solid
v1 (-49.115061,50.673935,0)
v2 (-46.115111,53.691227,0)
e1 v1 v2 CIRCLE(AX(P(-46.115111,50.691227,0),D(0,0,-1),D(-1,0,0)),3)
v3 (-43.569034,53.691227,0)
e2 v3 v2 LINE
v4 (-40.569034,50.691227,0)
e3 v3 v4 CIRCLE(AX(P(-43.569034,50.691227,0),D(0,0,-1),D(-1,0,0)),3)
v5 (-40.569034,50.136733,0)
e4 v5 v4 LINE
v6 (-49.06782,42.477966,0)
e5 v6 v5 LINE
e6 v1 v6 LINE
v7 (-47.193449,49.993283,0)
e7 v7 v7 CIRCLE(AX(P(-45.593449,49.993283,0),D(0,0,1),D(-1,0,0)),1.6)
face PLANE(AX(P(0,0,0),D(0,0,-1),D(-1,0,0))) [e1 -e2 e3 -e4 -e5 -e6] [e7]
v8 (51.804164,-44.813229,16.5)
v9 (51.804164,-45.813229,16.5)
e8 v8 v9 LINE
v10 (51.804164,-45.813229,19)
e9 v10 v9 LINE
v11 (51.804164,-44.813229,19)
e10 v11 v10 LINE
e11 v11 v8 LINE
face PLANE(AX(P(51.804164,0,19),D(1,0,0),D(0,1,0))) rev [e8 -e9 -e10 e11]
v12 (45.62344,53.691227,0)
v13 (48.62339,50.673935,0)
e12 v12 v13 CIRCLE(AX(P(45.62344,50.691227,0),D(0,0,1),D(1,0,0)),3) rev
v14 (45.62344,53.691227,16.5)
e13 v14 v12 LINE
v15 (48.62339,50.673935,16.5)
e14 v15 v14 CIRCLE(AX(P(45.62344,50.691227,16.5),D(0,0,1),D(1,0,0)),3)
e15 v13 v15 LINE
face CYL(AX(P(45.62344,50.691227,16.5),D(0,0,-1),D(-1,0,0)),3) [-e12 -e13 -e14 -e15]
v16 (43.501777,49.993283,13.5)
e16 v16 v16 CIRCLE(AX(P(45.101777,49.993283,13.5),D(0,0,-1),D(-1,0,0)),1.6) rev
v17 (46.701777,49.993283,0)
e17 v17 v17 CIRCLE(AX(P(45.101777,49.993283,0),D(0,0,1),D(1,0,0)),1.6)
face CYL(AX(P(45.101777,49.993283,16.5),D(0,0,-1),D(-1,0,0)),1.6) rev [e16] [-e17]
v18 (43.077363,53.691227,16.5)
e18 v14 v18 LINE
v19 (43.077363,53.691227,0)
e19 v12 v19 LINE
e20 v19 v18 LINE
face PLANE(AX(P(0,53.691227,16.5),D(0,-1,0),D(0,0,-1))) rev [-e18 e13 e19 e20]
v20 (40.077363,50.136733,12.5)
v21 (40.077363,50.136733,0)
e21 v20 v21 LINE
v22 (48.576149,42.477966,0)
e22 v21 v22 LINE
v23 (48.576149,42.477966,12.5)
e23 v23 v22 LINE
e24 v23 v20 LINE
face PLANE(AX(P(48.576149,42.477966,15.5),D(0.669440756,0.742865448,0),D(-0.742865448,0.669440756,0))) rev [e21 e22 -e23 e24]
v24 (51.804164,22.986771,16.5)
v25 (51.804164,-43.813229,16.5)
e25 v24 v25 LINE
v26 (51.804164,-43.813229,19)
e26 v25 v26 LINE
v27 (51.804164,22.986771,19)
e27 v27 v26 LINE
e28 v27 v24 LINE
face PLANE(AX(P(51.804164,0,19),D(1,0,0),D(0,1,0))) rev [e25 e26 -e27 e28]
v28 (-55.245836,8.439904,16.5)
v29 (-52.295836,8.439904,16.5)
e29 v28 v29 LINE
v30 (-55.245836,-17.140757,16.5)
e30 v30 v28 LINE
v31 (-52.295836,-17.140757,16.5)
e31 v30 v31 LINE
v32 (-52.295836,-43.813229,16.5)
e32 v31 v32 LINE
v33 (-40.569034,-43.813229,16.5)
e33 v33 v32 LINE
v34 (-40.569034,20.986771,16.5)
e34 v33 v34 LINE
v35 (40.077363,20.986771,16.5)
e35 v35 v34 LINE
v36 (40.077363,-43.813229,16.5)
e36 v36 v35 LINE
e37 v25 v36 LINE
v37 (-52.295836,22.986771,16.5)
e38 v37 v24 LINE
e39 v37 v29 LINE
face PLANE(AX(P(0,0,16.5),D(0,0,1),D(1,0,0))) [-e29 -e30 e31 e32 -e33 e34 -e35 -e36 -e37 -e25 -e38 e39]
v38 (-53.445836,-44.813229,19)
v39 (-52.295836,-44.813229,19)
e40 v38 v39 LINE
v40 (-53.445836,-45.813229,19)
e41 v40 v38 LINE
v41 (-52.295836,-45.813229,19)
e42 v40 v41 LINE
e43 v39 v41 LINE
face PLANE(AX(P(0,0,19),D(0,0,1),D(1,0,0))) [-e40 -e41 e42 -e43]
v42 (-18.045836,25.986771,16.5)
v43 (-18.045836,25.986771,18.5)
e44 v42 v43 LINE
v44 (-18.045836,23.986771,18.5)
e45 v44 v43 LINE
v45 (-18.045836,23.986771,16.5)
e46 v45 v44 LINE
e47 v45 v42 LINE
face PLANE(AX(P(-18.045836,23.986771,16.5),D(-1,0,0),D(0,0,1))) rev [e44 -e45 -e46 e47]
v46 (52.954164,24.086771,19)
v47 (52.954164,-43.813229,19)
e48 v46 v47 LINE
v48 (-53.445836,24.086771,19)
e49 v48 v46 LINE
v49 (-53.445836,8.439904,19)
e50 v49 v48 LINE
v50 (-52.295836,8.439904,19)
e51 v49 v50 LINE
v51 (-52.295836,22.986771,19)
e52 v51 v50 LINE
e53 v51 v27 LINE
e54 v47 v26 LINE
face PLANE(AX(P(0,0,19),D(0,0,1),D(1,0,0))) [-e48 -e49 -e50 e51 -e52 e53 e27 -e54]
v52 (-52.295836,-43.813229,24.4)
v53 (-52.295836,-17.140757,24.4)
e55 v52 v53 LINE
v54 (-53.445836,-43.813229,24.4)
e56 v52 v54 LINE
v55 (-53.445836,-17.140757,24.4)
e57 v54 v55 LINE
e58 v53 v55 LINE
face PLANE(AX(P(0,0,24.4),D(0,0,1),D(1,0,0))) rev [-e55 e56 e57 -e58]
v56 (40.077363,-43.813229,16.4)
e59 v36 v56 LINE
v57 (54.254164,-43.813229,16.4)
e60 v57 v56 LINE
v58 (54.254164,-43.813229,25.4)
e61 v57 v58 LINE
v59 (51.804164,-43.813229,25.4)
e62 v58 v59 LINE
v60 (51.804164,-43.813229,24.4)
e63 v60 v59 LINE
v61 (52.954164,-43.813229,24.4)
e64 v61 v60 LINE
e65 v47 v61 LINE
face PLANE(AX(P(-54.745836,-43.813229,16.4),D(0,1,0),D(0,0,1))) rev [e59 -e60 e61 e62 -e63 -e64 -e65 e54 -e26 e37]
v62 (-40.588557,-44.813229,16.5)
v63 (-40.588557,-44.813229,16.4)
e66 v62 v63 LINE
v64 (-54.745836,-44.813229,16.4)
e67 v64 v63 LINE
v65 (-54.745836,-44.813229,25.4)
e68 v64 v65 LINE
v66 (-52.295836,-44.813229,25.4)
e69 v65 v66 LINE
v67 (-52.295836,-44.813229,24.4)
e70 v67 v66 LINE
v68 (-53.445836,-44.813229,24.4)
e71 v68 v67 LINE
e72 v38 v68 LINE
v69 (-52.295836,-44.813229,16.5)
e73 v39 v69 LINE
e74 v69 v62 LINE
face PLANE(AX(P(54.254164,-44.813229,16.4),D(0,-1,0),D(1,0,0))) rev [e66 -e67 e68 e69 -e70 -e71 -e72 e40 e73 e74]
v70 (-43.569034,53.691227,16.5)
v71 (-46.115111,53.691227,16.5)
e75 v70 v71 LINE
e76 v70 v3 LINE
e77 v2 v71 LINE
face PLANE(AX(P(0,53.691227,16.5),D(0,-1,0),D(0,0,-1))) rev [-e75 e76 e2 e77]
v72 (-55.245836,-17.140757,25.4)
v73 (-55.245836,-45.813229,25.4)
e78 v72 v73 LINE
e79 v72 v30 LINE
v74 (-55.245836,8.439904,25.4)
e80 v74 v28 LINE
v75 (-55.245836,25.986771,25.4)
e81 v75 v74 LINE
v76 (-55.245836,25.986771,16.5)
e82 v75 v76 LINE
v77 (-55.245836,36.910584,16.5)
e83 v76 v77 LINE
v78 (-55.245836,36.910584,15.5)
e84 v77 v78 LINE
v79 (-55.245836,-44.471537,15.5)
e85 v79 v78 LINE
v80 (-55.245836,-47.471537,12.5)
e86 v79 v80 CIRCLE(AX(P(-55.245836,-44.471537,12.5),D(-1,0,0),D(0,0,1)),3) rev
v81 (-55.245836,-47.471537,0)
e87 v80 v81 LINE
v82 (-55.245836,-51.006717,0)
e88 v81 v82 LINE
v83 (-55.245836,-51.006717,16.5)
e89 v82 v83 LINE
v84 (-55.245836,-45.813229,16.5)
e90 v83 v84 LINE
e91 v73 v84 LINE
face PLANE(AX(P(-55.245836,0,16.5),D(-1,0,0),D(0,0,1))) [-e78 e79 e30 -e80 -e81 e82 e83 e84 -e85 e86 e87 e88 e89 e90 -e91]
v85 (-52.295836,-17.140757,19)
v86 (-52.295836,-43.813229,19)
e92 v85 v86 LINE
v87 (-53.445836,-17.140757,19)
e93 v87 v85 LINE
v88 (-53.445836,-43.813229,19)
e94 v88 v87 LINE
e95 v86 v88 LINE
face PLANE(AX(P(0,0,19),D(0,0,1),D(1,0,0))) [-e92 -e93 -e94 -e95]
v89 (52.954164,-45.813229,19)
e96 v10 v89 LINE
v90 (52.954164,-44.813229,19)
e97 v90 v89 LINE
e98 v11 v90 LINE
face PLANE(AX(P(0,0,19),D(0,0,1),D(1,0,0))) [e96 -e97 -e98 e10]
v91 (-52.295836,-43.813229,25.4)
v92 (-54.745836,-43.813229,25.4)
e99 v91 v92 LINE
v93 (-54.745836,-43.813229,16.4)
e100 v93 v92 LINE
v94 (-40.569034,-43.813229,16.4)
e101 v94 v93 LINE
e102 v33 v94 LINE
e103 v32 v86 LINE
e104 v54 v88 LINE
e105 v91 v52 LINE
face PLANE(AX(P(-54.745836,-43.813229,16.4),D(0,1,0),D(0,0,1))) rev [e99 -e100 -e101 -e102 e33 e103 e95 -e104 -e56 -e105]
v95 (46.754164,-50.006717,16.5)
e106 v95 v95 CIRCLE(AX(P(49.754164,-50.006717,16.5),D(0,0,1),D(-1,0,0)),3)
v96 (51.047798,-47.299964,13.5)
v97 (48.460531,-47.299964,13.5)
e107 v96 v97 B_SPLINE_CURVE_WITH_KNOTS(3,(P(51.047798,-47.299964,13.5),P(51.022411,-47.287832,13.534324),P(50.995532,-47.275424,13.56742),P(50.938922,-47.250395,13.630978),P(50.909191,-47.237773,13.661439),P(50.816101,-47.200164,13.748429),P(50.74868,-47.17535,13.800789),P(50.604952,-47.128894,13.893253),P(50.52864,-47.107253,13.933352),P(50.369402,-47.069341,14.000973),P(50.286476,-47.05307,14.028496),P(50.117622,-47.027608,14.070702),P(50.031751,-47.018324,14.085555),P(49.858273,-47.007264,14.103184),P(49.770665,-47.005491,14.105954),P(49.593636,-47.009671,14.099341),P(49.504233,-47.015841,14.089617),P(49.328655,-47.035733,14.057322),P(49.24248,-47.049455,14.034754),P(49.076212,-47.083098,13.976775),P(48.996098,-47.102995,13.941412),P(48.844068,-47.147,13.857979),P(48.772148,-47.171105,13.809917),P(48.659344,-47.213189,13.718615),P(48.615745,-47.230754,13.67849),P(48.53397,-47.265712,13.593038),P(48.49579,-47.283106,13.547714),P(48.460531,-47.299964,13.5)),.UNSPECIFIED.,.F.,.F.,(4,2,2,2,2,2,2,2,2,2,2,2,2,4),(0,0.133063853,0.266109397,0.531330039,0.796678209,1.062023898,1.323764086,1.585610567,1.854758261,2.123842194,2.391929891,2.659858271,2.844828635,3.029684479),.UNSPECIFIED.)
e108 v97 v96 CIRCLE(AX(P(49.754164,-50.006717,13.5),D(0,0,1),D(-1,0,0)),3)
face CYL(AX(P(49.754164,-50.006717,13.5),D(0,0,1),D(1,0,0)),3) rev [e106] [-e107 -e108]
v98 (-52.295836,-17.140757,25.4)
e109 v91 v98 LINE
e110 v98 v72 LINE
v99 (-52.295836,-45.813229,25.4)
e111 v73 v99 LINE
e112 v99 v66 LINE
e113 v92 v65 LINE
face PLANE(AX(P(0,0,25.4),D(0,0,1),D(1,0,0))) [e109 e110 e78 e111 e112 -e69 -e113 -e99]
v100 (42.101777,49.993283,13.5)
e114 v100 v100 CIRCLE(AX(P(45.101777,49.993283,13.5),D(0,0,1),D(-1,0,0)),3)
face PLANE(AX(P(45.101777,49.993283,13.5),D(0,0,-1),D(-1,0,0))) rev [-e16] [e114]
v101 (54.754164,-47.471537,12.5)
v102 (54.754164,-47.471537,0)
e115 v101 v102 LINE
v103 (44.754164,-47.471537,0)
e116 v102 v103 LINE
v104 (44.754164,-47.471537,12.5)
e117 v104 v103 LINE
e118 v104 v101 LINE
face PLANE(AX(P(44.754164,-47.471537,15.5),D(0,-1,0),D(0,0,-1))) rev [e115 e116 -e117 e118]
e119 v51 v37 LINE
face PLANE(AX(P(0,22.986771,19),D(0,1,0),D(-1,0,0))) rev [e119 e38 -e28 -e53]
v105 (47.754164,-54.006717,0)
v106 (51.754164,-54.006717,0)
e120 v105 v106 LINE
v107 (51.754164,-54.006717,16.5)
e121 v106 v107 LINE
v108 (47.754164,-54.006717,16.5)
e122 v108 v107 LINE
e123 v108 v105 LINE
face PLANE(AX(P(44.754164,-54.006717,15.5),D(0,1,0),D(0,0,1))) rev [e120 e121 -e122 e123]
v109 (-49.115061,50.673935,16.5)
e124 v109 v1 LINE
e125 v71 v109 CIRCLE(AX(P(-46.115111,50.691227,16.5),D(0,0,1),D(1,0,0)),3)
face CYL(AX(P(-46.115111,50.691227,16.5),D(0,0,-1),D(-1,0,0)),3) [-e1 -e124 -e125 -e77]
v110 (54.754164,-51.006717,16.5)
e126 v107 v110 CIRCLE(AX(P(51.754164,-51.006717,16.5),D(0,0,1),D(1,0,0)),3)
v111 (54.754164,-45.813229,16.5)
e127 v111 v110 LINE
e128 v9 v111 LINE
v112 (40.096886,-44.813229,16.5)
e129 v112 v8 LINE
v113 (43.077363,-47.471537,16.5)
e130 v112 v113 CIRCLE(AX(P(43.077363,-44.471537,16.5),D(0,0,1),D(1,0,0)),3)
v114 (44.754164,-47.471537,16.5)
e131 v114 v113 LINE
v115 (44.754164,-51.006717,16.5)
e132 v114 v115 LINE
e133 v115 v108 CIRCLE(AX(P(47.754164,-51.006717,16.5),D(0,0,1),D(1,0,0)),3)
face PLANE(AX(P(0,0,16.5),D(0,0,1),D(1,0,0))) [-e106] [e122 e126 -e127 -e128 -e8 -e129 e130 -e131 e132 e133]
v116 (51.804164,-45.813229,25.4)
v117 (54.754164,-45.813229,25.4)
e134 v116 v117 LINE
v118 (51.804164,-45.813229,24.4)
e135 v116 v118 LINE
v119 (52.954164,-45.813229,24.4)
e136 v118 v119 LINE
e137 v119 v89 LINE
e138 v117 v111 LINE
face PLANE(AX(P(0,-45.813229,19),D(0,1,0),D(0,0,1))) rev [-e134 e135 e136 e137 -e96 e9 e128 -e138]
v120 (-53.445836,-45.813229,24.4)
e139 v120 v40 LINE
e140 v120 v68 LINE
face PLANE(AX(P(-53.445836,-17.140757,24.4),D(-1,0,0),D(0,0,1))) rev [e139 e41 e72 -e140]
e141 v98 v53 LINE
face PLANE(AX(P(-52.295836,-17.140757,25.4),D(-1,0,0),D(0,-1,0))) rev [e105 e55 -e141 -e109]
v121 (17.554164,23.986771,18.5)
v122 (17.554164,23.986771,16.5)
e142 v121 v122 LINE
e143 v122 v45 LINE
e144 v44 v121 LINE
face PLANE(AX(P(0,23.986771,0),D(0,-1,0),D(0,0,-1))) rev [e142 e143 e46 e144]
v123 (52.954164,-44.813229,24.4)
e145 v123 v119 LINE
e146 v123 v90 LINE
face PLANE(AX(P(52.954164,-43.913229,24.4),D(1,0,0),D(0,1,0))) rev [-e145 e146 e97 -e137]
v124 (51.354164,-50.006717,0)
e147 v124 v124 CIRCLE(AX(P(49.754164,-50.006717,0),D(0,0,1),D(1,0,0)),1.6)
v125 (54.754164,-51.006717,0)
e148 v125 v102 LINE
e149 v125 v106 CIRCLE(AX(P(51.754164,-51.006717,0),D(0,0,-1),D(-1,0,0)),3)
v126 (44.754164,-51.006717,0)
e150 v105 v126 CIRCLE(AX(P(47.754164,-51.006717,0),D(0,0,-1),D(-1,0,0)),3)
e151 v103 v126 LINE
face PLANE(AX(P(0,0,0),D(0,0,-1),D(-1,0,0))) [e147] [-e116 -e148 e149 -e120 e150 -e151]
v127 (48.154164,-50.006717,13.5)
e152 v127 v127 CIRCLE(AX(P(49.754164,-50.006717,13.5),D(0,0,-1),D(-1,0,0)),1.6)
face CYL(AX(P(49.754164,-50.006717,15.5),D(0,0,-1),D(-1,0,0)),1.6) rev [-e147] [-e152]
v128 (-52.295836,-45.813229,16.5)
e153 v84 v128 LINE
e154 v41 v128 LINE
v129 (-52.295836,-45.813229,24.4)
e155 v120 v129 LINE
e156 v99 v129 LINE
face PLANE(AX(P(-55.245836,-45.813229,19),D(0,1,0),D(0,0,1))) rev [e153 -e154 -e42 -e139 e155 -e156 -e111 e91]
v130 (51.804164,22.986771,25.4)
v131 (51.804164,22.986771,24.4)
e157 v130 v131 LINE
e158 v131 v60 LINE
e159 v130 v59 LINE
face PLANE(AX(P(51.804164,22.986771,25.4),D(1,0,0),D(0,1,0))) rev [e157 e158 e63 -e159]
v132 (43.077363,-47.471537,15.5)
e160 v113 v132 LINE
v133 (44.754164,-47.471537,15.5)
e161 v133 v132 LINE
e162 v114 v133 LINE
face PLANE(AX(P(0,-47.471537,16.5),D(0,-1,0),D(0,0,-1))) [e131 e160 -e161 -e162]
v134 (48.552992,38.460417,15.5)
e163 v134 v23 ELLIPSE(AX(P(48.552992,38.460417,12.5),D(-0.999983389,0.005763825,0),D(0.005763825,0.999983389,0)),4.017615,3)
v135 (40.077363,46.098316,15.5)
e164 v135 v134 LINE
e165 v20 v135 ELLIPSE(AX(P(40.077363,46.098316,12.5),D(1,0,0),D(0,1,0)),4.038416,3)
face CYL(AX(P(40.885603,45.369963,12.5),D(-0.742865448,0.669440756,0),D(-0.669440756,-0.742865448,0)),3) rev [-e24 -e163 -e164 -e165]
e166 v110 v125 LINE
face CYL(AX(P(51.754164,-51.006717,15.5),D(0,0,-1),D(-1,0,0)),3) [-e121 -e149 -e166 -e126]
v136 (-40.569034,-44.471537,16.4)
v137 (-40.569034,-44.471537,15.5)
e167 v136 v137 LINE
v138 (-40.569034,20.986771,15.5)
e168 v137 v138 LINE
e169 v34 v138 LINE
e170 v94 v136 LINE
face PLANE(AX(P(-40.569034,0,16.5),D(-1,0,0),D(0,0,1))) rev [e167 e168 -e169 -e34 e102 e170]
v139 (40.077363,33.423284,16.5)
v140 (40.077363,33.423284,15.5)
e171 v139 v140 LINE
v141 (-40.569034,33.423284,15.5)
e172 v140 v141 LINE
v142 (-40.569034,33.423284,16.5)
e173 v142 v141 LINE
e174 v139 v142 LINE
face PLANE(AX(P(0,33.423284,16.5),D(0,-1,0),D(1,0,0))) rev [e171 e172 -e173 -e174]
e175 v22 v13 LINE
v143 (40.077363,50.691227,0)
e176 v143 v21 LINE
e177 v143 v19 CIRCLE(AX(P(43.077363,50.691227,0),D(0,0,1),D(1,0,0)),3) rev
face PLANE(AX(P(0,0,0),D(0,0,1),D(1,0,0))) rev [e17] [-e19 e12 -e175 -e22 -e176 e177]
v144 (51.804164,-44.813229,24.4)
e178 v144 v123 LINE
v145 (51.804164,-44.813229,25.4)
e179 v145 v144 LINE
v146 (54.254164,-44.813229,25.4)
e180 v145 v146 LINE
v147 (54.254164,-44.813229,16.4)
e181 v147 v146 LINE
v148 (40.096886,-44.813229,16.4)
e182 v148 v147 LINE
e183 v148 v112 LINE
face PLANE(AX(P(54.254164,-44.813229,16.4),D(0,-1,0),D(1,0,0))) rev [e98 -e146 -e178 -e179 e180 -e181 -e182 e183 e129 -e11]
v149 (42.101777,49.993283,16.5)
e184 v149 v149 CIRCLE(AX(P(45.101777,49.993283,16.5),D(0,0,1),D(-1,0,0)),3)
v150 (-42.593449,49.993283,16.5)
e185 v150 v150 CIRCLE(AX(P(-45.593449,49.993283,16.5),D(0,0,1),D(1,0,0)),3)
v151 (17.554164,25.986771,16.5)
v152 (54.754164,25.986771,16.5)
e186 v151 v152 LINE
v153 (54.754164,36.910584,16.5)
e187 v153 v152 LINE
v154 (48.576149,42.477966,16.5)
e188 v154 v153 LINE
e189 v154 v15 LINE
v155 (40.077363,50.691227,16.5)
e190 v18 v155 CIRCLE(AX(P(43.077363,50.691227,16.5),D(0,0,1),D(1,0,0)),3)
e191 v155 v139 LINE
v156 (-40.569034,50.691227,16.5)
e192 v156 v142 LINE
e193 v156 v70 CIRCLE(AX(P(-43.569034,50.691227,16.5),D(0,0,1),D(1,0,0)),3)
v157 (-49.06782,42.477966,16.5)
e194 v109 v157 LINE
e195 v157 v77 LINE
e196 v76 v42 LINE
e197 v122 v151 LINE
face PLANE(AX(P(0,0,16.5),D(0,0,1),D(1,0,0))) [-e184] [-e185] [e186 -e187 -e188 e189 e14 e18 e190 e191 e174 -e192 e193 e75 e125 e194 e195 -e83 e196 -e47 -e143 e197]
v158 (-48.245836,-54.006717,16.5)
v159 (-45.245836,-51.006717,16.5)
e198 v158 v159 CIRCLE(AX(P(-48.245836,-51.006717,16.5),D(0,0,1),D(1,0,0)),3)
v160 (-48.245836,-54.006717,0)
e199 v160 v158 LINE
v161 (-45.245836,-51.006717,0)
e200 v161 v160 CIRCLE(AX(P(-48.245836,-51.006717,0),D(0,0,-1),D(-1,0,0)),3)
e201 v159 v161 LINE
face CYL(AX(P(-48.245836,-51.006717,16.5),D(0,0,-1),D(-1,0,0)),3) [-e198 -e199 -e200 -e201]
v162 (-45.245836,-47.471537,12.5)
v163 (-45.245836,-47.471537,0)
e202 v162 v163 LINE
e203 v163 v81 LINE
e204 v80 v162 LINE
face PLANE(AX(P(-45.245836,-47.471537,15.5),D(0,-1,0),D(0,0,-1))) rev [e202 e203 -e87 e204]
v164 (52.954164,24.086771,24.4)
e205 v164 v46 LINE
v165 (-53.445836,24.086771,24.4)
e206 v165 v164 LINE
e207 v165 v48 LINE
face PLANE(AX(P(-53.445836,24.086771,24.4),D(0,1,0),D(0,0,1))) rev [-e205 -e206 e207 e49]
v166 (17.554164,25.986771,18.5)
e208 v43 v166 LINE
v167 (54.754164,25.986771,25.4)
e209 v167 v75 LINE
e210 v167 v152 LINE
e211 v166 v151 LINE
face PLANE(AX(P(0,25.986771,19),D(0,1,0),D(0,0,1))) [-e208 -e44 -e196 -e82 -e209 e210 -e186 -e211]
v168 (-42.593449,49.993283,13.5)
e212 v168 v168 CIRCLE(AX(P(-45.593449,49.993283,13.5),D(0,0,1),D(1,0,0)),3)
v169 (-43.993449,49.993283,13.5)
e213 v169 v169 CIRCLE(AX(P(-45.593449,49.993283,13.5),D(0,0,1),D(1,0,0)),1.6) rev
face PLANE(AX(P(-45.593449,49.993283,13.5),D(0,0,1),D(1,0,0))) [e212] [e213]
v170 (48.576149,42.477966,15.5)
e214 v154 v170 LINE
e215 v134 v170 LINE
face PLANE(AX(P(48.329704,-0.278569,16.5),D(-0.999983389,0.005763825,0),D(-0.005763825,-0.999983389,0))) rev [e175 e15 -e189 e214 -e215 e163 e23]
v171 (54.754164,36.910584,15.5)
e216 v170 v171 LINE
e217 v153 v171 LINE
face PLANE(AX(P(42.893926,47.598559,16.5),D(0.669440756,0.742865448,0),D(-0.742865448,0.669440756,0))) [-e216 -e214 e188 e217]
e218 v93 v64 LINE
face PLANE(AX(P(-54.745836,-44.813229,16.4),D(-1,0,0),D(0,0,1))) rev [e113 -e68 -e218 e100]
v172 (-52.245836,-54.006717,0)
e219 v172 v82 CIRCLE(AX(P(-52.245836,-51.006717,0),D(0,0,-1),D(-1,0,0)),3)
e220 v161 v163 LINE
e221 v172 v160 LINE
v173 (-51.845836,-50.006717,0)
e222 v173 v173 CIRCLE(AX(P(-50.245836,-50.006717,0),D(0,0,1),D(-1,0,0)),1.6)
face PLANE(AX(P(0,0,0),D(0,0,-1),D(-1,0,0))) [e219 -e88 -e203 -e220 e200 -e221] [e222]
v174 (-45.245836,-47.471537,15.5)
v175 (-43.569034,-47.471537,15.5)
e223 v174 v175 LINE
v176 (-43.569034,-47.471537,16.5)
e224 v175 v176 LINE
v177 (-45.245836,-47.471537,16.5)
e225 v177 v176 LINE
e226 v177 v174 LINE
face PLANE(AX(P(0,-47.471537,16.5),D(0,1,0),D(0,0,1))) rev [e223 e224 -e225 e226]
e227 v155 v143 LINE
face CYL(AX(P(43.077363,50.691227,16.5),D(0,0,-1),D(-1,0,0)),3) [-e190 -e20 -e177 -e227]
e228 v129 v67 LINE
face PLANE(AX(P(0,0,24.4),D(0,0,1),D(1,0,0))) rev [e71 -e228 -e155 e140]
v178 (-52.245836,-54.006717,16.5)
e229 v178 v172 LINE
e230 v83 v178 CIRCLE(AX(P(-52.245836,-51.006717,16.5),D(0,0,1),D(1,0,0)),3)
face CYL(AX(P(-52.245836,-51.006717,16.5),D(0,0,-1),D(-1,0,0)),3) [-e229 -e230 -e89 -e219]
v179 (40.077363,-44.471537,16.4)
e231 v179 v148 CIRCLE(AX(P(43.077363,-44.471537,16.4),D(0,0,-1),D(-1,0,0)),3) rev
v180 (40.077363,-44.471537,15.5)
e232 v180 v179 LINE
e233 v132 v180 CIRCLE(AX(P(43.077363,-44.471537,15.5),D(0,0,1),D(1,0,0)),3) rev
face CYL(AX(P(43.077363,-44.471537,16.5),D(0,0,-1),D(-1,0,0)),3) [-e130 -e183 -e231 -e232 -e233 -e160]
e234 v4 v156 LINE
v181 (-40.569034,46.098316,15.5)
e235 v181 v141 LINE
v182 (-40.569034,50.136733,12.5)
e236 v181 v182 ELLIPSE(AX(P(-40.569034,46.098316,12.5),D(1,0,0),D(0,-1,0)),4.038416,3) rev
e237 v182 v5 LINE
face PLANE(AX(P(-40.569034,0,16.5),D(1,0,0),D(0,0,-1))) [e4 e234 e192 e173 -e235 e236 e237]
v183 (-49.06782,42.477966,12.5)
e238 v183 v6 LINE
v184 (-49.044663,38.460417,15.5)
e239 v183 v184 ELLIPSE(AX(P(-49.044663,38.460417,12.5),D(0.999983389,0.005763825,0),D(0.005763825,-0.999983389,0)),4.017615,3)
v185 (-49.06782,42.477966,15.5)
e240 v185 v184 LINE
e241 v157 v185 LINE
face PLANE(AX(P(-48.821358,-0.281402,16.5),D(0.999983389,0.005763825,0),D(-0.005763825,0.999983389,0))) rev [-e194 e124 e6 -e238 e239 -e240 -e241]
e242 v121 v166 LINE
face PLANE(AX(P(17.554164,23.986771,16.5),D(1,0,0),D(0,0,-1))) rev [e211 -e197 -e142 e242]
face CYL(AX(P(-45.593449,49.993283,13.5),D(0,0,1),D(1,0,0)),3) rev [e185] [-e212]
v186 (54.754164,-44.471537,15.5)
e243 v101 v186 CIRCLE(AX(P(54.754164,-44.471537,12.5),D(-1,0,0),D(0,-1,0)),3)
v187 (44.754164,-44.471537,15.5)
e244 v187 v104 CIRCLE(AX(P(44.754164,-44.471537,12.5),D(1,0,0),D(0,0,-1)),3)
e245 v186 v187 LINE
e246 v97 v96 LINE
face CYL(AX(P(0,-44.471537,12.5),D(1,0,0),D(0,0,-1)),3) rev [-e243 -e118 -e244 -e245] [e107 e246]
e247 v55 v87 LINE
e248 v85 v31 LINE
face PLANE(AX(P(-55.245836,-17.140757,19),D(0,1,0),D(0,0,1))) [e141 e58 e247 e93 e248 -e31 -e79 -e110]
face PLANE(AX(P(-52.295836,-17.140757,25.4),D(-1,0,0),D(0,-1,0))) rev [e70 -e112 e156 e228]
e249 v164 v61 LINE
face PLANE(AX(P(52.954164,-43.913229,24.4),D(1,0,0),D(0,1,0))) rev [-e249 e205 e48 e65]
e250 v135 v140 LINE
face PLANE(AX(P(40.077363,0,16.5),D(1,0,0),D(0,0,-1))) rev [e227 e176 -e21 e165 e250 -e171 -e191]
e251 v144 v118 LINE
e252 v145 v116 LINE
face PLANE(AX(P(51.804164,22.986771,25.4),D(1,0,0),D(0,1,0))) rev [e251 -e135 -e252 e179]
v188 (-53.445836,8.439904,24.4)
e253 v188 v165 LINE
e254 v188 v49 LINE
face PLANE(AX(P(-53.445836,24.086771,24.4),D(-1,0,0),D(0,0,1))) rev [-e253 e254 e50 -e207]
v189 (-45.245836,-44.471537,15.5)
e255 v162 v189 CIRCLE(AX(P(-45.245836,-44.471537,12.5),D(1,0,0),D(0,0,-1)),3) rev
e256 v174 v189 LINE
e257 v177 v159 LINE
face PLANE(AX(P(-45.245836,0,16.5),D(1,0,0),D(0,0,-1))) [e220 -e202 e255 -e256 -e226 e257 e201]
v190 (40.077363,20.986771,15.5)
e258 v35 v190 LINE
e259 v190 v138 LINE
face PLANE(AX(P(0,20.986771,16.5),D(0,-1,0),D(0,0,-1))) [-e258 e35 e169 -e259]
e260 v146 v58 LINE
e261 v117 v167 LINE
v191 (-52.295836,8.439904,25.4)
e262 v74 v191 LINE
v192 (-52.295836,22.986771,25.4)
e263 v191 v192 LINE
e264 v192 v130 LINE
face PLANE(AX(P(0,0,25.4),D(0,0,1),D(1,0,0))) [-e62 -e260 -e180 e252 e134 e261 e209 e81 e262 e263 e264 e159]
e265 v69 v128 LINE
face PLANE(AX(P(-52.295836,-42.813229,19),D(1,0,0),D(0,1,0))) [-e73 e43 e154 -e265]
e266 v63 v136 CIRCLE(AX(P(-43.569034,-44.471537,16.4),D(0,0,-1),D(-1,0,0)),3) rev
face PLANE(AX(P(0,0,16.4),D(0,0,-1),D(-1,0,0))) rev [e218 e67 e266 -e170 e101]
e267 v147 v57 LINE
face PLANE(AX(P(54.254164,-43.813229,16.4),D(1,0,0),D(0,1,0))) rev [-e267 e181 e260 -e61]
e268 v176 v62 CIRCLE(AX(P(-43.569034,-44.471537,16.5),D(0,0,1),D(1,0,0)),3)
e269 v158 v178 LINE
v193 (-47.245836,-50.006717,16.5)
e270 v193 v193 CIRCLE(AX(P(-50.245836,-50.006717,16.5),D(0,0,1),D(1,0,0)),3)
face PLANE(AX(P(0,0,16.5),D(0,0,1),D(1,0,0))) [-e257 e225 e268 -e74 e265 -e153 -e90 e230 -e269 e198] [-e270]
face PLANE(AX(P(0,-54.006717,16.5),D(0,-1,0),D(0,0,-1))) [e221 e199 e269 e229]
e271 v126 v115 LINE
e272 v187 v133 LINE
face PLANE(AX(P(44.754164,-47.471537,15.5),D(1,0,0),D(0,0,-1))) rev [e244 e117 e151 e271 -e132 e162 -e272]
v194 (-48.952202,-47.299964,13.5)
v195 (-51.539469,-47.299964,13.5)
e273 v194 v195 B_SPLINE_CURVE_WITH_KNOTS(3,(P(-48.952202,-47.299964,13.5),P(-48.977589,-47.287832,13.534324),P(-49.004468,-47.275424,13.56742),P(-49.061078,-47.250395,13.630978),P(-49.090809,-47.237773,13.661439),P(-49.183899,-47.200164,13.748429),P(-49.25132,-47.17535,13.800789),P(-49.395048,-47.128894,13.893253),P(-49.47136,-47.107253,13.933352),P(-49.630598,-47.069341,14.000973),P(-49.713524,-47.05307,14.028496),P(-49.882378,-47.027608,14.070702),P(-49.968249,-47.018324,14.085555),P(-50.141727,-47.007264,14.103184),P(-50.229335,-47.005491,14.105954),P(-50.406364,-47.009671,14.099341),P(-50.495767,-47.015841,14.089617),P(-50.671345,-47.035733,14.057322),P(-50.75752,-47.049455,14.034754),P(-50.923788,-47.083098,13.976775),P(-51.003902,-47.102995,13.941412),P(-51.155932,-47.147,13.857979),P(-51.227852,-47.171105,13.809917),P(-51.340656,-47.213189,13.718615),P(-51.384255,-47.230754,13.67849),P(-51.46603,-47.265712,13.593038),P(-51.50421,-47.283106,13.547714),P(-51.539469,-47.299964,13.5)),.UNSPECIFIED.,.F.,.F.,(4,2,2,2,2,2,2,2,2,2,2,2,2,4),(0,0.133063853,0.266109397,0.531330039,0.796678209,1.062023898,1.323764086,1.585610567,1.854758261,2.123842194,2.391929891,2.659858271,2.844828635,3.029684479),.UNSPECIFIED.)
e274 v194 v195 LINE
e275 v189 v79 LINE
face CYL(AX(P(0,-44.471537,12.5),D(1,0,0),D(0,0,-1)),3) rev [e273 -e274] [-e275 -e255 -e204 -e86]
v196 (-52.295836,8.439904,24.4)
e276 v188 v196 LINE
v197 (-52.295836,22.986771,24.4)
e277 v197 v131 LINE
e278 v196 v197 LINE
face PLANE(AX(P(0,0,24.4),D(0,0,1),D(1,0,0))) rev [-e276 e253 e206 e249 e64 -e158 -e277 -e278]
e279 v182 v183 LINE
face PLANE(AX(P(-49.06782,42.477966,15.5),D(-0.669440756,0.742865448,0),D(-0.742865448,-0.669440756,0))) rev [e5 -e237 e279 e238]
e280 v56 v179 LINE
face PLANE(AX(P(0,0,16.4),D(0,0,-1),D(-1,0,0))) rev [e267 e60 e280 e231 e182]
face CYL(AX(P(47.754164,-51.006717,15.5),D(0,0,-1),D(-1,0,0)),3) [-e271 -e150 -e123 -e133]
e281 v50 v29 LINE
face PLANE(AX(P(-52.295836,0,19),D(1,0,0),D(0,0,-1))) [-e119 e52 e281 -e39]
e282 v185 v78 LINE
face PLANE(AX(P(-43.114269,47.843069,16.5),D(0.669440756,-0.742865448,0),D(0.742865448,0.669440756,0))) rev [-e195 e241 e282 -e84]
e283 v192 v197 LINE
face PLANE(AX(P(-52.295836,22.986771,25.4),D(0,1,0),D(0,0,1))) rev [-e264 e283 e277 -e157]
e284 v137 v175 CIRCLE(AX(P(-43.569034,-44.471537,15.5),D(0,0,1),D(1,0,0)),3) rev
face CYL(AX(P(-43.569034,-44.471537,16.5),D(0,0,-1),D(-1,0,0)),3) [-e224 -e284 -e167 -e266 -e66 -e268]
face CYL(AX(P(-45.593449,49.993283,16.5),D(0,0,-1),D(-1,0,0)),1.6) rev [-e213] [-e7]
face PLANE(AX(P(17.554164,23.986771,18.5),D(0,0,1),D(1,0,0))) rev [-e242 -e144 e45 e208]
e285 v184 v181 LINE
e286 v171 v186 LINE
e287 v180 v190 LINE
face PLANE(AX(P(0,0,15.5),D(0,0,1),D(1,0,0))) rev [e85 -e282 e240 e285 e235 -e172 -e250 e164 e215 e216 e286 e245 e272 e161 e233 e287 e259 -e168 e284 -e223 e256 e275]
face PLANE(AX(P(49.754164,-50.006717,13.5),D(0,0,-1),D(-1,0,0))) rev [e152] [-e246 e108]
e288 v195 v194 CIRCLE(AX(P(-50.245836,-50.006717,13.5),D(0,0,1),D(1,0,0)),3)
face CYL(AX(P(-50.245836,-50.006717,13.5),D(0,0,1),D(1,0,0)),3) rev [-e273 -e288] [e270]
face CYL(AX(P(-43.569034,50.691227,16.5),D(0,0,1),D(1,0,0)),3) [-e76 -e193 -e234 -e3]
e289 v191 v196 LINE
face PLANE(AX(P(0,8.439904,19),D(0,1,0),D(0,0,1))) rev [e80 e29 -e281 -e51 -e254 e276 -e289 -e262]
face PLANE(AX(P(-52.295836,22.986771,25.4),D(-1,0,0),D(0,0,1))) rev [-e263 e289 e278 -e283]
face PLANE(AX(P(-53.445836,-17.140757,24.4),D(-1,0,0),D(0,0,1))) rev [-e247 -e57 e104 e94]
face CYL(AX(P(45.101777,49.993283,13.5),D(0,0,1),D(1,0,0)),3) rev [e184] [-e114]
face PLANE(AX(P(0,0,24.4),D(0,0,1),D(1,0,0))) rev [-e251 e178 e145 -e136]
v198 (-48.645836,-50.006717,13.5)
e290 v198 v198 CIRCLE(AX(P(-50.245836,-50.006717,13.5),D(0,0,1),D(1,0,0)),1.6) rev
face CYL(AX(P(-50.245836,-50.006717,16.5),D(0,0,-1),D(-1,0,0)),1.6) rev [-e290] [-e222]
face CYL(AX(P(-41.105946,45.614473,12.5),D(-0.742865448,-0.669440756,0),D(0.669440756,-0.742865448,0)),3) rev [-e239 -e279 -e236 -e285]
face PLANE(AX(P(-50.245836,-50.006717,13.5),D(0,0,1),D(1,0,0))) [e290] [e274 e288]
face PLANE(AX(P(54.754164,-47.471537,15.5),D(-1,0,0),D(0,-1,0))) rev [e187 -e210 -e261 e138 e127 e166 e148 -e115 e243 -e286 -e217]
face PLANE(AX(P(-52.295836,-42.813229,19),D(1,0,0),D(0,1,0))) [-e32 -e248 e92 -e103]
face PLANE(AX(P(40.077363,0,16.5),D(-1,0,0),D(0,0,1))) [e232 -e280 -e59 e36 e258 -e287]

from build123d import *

# Parameters (mm, degrees)
SKETCH1_W             = 6.535180092
SKETCH1_H             = 10
SKETCH1_R             = 1.6
BOSS_EXTRUDE1_DEPTH   = 15.5
BOSS_EXTRUDE1_2_DEPTH = 15.5
BOSS_EXTRUDE1_3_DEPTH = 15.5
BOSS_EXTRUDE1_4_DEPTH = 15.5
SKETCH2_R             = 1.6
BOSS_EXTRUDE2_DEPTH   = 1
SKETCH3_W             = 2.95
SKETCH3_H             = 28.672472045
BOSS_EXTRUDE3_DEPTH   = 2.5
BOSS_EXTRUDE4_DEPTH   = 5.4
SKETCH5_W             = 2.95
SKETCH5_H             = 28.672472045
BOSS_EXTRUDE5_DEPTH   = 1
SKETCH7_W             = 109
SKETCH7_H             = 1
CUT_EXTRUDE1_DEPTH    = 9
FILLET1_R             = 3
FILLET2_R             = 3
SKETCH8_W             = 35.6
SKETCH8_H             = 2
CUT_EXTRUDE2_DEPTH    = 2
SKETCH9_R             = 3
CUT_EXTRUDE3_DEPTH    = 3


with BuildPart() as part:
    # Sketch1 → Boss-Extrude1 (new body)
    with BuildSketch(Plane(origin=(0, 0, 0), x_dir=(0, 1, 0), z_dir=(0, 0, 1))):
        with Locations((-50.739127193, -49.754164457)):
            Rectangle(SKETCH1_W, SKETCH1_H)
        with Locations(Location((-50.006717239, -49.754164457, 0), (0, 0, 270))):
            Circle(SKETCH1_R, mode=Mode.SUBTRACT)
    extrude(amount=BOSS_EXTRUDE1_DEPTH)



with BuildPart() as body_2:
    # Sketch1 → Boss-Extrude1 2 (new body)
    with BuildSketch(Plane(origin=(0, 0, 0), x_dir=(0, 1, 0), z_dir=(0, 0, 1))):
        Polygon((42.477965747, -48.576148962), (50.136732851, -40.077363358), (53.691226628, -40.077363358), (53.691226628, -48.640781304), align=None)
        with Locations(Location((49.993282761, -45.101777457, 0), (0, 0, 270))):
            Circle(SKETCH1_R, mode=Mode.SUBTRACT)
    extrude(amount=BOSS_EXTRUDE1_2_DEPTH)


with BuildPart() as body_3:
    # Sketch1 → Boss-Extrude1 3 (new body)
    with BuildSketch(Plane(origin=(0, 0, 0), x_dir=(0, 1, 0), z_dir=(0, 0, 1))):
        Polygon((53.691226628, 49.132452389), (42.477965747, 49.067820047), (50.136732851, 40.569034443), (53.691226628, 40.569034443), align=None)
        with Locations(Location((49.993282761, 45.593448542, 0), (0, 0, 90))):
            Circle(SKETCH1_R, mode=Mode.SUBTRACT)
    extrude(amount=BOSS_EXTRUDE1_3_DEPTH)


with BuildPart() as body_4:
    # Sketch1 → Boss-Extrude1 4 (new body)
    with BuildSketch(Plane(origin=(0, 0, 0), x_dir=(0, 1, 0), z_dir=(0, 0, 1))):
        with Locations((-50.739127193, 50.245835543)):
            Rectangle(SKETCH1_W, SKETCH1_H)
        with Locations(Location((-50.006717239, 50.245835543, 0), (0, 0, 90))):
            Circle(SKETCH1_R, mode=Mode.SUBTRACT)
    extrude(amount=BOSS_EXTRUDE1_4_DEPTH)


with BuildPart() as part_1:
    add(part.part)

    add(body_2.part)  # Boss-Extrude2 merges body 2

    add(body_3.part)  # Boss-Extrude2 merges body 3

    add(body_4.part)  # Boss-Extrude2 merges body 4
    # Sketch2 → Boss-Extrude2 (add)
    with BuildSketch(Plane.XY.offset(15.5)):
        Polygon((54.754164457, -47.471537147), (54.754164457, -54.006717239), (44.754164457, -54.006717239), (44.754164457, -47.471537147), (40.077363358, -47.471537147), (40.077363358, 20.986771333), (-40.569034443, 20.986771333), (-40.569034443, -47.471537147), (-45.245835543, -47.471537147), (-45.245835543, -54.006717239), (-55.245835543, -54.006717239), (-55.245835543, -47.471537147), (-55.245835543, 36.910584236), (-49.067820047, 42.477965747), (-49.132452389, 53.691226628), (-40.569034443, 53.691226628), (-40.569034443, 33.42328432), (40.077363358, 33.42328432), (40.077363358, 53.691226628), (48.640781304, 53.691226628), (48.576148962, 42.477965747), (54.754164457, 36.910584236), align=None)
        with Locations((49.754164457, -50.006717239)):
            Circle(SKETCH2_R, mode=Mode.SUBTRACT)
        with Locations((45.101777457, 49.993282761)):
            Circle(SKETCH2_R, mode=Mode.SUBTRACT)
        with Locations(Location((-45.593448542, 49.993282761, 0), (0, 0, 180))):
            Circle(SKETCH2_R, mode=Mode.SUBTRACT)
        with Locations(Location((-50.245835543, -50.006717239, 0), (0, 0, 180))):
            Circle(SKETCH2_R, mode=Mode.SUBTRACT)
    extrude(amount=BOSS_EXTRUDE2_DEPTH)

    # Sketch3 → Boss-Extrude3 (add)
    with BuildSketch(Plane.XY.offset(16.5)):
        Polygon((-52.295835543, 8.439904174), (-52.295835543, 22.986771333), (51.804164457, 22.986771333), (51.804164457, -45.813228667), (54.754164457, -45.813228667), (54.754164457, 25.986771333), (-55.245835543, 25.986771333), (-55.245835543, 8.439904174), align=None)
        with Locations((-53.770835543, -31.476992645)):
            Rectangle(SKETCH3_W, SKETCH3_H)
    extrude(amount=BOSS_EXTRUDE3_DEPTH)

    # Sketch4 → Boss-Extrude4 (add)
    with BuildSketch(Plane.XY.offset(19)):
        Polygon((-55.245835543, 25.986771333), (54.754164457, 25.986771333), (54.754164457, -45.813228667), (52.954164457, -45.813228667), (52.954164457, -43.913228667), (52.954164457, 24.086771333), (-53.445835543, 24.086771333), (-53.445835543, 8.439904174), (-55.245835543, 8.439904174), align=None)
        Polygon((-55.245835543, -45.813228667), (-53.445835543, -45.813228667), (-53.445835543, -43.913228667), (-53.445835543, -17.140756622), (-55.245835543, -17.140756622), align=None)
    extrude(amount=BOSS_EXTRUDE4_DEPTH)

    # Sketch5 → Boss-Extrude5 (add)
    with BuildSketch(Plane.XY.offset(24.4)):
        Polygon((-55.245835543, 8.439904174), (-52.295835543, 8.439904174), (-52.295835543, 22.986771333), (51.804164457, 22.986771333), (51.804164457, -45.813228667), (54.754164457, -45.813228667), (54.754164457, 25.986771333), (-55.245835543, 25.986771333), align=None)
        with Locations((-53.770835543, -31.476992645)):
            Rectangle(SKETCH5_W, SKETCH5_H)
    extrude(amount=BOSS_EXTRUDE5_DEPTH)

    # Sketch7 → Cut-Extrude1 (cut)
    with BuildSketch(Plane.XY.offset(25.4)):
        with Locations((-0.245835543, -44.313228667)):
            Rectangle(SKETCH7_W, SKETCH7_H)
    extrude(amount=-CUT_EXTRUDE1_DEPTH, mode=Mode.SUBTRACT)

    # Fillet1
    fillet1_edges = [part_1.edges().sort_by_distance(p)[0] for p in [
        (48.640781304, 53.691226628, 7.75),
        (-49.132452389, 53.691226628, 7.75),
        (-40.569034443, -47.471537147, 16),
        (-55.245835543, -54.006717239, 8.25),
        (-45.245835543, -54.006717239, 8.25),
        (40.077363358, -47.471537147, 16),
        (44.754164457, -54.006717239, 8.25),
        (54.754164457, -54.006717239, 8.25),
        (40.077363358, 53.691226628, 7.75),
        (-40.569034443, 53.691226628, 7.75),
    ]]
    fillet(fillet1_edges, radius=FILLET1_R)

    # Fillet2
    # the kernel refuses this fillet: 3 mm, written as the material it adds along each edge
    with BuildSketch(Plane(origin=(54.147639825, 37.457160078, 15.5), x_dir=(0, 0, -1), z_dir=(-0.7428654483971854, 0.6694407558385198, 0))) as fillet2_piece_1_section:
        with BuildLine():
            CenterArc((FILLET2_R, FILLET2_R), FILLET2_R, 180, 90)
            Line((0, FILLET2_R), (0, 0))
            Line((0, 0), (FILLET2_R, 0))
        make_face()
    fillet2_piece_1 = extrude(amount=26.440545017, mode=Mode.PRIVATE)
    fillet2_piece_1 = split(fillet2_piece_1, bisect_by=Plane(origin=(48.592895704, 45.383408694, 14.829727011), z_dir=(-0.9999833890252455, 0.005763824562264406, 0)), keep=Keep.TOP, mode=Mode.PRIVATE)
    fillet2_piece_1 = split(fillet2_piece_1, bisect_by=Plane(origin=(40.077363358, 45.408013282, 14.829727011), z_dir=(1, 0, 0)), keep=Keep.TOP, mode=Mode.PRIVATE)
    add(fillet2_piece_1)
    with BuildSketch(Plane(origin=(-54.63931091, 37.457160078, 15.5), x_dir=(0, 0, -1), z_dir=(0.7428654483971854, 0.6694407558385198, 0))) as fillet2_piece_2_section:
        with BuildLine():
            CenterArc((FILLET2_R, -FILLET2_R), FILLET2_R, 90, 90)
            Line((0, -FILLET2_R), (0, 0))
            Line((0, 0), (FILLET2_R, 0))
        make_face()
    fillet2_piece_2 = extrude(amount=26.440545017, mode=Mode.PRIVATE)
    fillet2_piece_2 = split(fillet2_piece_2, bisect_by=Plane(origin=(-40.569034443, 45.408013282, 14.829727011), z_dir=(-1, 0, 0)), keep=Keep.TOP, mode=Mode.PRIVATE)
    fillet2_piece_2 = split(fillet2_piece_2, bisect_by=Plane(origin=(-49.084566789, 45.383408694, 14.829727011), z_dir=(0.9999833890252455, 0.005763824562264406, 0)), keep=Keep.TOP, mode=Mode.PRIVATE)
    add(fillet2_piece_2)
    with BuildSketch(Plane(origin=(-45.245835543, -47.471537147, 15.5), x_dir=(0, 0, -1), z_dir=(-1, 0, 0)), Plane(origin=(44.754164457, -47.471537147, 15.5), x_dir=(0, 1, 0), z_dir=(1, 0, 0))) as fillet2_piece_3:
        with BuildLine():
            CenterArc((FILLET2_R, -FILLET2_R), FILLET2_R, 90, 90)
            Line((0, -FILLET2_R), (0, 0))
            Line((0, 0), (FILLET2_R, 0))
        make_face()
    extrude(amount=10)

    # Sketch8 → Cut-Extrude2 (cut)
    with BuildSketch(Plane(origin=(0, 25.986771333, 0), x_dir=(-1, 0, 0), z_dir=(0, 1, 0))):
        with Locations((0.245835543, 17.5)):
            Rectangle(SKETCH8_W, SKETCH8_H)
    extrude(amount=-CUT_EXTRUDE2_DEPTH, mode=Mode.SUBTRACT)

    # Sketch9 → Cut-Extrude3 (cut)
    with BuildSketch(Plane.XY.offset(16.5)):
        with Locations((-45.593448542, 49.993282761)):
            Circle(SKETCH9_R)
        with Locations((-50.245835543, -50.006717239)):
            Circle(SKETCH9_R)
        with Locations(Location((49.754164457, -50.006717239, 0), (0, 0, 64.455545536))):
            Circle(SKETCH9_R)
        with Locations(Location((45.101777457, 49.993282761, 0), (0, 0, 180))):
            Circle(SKETCH9_R)
    extrude(amount=-CUT_EXTRUDE3_DEPTH, mode=Mode.SUBTRACT)


solid = part_1.part
